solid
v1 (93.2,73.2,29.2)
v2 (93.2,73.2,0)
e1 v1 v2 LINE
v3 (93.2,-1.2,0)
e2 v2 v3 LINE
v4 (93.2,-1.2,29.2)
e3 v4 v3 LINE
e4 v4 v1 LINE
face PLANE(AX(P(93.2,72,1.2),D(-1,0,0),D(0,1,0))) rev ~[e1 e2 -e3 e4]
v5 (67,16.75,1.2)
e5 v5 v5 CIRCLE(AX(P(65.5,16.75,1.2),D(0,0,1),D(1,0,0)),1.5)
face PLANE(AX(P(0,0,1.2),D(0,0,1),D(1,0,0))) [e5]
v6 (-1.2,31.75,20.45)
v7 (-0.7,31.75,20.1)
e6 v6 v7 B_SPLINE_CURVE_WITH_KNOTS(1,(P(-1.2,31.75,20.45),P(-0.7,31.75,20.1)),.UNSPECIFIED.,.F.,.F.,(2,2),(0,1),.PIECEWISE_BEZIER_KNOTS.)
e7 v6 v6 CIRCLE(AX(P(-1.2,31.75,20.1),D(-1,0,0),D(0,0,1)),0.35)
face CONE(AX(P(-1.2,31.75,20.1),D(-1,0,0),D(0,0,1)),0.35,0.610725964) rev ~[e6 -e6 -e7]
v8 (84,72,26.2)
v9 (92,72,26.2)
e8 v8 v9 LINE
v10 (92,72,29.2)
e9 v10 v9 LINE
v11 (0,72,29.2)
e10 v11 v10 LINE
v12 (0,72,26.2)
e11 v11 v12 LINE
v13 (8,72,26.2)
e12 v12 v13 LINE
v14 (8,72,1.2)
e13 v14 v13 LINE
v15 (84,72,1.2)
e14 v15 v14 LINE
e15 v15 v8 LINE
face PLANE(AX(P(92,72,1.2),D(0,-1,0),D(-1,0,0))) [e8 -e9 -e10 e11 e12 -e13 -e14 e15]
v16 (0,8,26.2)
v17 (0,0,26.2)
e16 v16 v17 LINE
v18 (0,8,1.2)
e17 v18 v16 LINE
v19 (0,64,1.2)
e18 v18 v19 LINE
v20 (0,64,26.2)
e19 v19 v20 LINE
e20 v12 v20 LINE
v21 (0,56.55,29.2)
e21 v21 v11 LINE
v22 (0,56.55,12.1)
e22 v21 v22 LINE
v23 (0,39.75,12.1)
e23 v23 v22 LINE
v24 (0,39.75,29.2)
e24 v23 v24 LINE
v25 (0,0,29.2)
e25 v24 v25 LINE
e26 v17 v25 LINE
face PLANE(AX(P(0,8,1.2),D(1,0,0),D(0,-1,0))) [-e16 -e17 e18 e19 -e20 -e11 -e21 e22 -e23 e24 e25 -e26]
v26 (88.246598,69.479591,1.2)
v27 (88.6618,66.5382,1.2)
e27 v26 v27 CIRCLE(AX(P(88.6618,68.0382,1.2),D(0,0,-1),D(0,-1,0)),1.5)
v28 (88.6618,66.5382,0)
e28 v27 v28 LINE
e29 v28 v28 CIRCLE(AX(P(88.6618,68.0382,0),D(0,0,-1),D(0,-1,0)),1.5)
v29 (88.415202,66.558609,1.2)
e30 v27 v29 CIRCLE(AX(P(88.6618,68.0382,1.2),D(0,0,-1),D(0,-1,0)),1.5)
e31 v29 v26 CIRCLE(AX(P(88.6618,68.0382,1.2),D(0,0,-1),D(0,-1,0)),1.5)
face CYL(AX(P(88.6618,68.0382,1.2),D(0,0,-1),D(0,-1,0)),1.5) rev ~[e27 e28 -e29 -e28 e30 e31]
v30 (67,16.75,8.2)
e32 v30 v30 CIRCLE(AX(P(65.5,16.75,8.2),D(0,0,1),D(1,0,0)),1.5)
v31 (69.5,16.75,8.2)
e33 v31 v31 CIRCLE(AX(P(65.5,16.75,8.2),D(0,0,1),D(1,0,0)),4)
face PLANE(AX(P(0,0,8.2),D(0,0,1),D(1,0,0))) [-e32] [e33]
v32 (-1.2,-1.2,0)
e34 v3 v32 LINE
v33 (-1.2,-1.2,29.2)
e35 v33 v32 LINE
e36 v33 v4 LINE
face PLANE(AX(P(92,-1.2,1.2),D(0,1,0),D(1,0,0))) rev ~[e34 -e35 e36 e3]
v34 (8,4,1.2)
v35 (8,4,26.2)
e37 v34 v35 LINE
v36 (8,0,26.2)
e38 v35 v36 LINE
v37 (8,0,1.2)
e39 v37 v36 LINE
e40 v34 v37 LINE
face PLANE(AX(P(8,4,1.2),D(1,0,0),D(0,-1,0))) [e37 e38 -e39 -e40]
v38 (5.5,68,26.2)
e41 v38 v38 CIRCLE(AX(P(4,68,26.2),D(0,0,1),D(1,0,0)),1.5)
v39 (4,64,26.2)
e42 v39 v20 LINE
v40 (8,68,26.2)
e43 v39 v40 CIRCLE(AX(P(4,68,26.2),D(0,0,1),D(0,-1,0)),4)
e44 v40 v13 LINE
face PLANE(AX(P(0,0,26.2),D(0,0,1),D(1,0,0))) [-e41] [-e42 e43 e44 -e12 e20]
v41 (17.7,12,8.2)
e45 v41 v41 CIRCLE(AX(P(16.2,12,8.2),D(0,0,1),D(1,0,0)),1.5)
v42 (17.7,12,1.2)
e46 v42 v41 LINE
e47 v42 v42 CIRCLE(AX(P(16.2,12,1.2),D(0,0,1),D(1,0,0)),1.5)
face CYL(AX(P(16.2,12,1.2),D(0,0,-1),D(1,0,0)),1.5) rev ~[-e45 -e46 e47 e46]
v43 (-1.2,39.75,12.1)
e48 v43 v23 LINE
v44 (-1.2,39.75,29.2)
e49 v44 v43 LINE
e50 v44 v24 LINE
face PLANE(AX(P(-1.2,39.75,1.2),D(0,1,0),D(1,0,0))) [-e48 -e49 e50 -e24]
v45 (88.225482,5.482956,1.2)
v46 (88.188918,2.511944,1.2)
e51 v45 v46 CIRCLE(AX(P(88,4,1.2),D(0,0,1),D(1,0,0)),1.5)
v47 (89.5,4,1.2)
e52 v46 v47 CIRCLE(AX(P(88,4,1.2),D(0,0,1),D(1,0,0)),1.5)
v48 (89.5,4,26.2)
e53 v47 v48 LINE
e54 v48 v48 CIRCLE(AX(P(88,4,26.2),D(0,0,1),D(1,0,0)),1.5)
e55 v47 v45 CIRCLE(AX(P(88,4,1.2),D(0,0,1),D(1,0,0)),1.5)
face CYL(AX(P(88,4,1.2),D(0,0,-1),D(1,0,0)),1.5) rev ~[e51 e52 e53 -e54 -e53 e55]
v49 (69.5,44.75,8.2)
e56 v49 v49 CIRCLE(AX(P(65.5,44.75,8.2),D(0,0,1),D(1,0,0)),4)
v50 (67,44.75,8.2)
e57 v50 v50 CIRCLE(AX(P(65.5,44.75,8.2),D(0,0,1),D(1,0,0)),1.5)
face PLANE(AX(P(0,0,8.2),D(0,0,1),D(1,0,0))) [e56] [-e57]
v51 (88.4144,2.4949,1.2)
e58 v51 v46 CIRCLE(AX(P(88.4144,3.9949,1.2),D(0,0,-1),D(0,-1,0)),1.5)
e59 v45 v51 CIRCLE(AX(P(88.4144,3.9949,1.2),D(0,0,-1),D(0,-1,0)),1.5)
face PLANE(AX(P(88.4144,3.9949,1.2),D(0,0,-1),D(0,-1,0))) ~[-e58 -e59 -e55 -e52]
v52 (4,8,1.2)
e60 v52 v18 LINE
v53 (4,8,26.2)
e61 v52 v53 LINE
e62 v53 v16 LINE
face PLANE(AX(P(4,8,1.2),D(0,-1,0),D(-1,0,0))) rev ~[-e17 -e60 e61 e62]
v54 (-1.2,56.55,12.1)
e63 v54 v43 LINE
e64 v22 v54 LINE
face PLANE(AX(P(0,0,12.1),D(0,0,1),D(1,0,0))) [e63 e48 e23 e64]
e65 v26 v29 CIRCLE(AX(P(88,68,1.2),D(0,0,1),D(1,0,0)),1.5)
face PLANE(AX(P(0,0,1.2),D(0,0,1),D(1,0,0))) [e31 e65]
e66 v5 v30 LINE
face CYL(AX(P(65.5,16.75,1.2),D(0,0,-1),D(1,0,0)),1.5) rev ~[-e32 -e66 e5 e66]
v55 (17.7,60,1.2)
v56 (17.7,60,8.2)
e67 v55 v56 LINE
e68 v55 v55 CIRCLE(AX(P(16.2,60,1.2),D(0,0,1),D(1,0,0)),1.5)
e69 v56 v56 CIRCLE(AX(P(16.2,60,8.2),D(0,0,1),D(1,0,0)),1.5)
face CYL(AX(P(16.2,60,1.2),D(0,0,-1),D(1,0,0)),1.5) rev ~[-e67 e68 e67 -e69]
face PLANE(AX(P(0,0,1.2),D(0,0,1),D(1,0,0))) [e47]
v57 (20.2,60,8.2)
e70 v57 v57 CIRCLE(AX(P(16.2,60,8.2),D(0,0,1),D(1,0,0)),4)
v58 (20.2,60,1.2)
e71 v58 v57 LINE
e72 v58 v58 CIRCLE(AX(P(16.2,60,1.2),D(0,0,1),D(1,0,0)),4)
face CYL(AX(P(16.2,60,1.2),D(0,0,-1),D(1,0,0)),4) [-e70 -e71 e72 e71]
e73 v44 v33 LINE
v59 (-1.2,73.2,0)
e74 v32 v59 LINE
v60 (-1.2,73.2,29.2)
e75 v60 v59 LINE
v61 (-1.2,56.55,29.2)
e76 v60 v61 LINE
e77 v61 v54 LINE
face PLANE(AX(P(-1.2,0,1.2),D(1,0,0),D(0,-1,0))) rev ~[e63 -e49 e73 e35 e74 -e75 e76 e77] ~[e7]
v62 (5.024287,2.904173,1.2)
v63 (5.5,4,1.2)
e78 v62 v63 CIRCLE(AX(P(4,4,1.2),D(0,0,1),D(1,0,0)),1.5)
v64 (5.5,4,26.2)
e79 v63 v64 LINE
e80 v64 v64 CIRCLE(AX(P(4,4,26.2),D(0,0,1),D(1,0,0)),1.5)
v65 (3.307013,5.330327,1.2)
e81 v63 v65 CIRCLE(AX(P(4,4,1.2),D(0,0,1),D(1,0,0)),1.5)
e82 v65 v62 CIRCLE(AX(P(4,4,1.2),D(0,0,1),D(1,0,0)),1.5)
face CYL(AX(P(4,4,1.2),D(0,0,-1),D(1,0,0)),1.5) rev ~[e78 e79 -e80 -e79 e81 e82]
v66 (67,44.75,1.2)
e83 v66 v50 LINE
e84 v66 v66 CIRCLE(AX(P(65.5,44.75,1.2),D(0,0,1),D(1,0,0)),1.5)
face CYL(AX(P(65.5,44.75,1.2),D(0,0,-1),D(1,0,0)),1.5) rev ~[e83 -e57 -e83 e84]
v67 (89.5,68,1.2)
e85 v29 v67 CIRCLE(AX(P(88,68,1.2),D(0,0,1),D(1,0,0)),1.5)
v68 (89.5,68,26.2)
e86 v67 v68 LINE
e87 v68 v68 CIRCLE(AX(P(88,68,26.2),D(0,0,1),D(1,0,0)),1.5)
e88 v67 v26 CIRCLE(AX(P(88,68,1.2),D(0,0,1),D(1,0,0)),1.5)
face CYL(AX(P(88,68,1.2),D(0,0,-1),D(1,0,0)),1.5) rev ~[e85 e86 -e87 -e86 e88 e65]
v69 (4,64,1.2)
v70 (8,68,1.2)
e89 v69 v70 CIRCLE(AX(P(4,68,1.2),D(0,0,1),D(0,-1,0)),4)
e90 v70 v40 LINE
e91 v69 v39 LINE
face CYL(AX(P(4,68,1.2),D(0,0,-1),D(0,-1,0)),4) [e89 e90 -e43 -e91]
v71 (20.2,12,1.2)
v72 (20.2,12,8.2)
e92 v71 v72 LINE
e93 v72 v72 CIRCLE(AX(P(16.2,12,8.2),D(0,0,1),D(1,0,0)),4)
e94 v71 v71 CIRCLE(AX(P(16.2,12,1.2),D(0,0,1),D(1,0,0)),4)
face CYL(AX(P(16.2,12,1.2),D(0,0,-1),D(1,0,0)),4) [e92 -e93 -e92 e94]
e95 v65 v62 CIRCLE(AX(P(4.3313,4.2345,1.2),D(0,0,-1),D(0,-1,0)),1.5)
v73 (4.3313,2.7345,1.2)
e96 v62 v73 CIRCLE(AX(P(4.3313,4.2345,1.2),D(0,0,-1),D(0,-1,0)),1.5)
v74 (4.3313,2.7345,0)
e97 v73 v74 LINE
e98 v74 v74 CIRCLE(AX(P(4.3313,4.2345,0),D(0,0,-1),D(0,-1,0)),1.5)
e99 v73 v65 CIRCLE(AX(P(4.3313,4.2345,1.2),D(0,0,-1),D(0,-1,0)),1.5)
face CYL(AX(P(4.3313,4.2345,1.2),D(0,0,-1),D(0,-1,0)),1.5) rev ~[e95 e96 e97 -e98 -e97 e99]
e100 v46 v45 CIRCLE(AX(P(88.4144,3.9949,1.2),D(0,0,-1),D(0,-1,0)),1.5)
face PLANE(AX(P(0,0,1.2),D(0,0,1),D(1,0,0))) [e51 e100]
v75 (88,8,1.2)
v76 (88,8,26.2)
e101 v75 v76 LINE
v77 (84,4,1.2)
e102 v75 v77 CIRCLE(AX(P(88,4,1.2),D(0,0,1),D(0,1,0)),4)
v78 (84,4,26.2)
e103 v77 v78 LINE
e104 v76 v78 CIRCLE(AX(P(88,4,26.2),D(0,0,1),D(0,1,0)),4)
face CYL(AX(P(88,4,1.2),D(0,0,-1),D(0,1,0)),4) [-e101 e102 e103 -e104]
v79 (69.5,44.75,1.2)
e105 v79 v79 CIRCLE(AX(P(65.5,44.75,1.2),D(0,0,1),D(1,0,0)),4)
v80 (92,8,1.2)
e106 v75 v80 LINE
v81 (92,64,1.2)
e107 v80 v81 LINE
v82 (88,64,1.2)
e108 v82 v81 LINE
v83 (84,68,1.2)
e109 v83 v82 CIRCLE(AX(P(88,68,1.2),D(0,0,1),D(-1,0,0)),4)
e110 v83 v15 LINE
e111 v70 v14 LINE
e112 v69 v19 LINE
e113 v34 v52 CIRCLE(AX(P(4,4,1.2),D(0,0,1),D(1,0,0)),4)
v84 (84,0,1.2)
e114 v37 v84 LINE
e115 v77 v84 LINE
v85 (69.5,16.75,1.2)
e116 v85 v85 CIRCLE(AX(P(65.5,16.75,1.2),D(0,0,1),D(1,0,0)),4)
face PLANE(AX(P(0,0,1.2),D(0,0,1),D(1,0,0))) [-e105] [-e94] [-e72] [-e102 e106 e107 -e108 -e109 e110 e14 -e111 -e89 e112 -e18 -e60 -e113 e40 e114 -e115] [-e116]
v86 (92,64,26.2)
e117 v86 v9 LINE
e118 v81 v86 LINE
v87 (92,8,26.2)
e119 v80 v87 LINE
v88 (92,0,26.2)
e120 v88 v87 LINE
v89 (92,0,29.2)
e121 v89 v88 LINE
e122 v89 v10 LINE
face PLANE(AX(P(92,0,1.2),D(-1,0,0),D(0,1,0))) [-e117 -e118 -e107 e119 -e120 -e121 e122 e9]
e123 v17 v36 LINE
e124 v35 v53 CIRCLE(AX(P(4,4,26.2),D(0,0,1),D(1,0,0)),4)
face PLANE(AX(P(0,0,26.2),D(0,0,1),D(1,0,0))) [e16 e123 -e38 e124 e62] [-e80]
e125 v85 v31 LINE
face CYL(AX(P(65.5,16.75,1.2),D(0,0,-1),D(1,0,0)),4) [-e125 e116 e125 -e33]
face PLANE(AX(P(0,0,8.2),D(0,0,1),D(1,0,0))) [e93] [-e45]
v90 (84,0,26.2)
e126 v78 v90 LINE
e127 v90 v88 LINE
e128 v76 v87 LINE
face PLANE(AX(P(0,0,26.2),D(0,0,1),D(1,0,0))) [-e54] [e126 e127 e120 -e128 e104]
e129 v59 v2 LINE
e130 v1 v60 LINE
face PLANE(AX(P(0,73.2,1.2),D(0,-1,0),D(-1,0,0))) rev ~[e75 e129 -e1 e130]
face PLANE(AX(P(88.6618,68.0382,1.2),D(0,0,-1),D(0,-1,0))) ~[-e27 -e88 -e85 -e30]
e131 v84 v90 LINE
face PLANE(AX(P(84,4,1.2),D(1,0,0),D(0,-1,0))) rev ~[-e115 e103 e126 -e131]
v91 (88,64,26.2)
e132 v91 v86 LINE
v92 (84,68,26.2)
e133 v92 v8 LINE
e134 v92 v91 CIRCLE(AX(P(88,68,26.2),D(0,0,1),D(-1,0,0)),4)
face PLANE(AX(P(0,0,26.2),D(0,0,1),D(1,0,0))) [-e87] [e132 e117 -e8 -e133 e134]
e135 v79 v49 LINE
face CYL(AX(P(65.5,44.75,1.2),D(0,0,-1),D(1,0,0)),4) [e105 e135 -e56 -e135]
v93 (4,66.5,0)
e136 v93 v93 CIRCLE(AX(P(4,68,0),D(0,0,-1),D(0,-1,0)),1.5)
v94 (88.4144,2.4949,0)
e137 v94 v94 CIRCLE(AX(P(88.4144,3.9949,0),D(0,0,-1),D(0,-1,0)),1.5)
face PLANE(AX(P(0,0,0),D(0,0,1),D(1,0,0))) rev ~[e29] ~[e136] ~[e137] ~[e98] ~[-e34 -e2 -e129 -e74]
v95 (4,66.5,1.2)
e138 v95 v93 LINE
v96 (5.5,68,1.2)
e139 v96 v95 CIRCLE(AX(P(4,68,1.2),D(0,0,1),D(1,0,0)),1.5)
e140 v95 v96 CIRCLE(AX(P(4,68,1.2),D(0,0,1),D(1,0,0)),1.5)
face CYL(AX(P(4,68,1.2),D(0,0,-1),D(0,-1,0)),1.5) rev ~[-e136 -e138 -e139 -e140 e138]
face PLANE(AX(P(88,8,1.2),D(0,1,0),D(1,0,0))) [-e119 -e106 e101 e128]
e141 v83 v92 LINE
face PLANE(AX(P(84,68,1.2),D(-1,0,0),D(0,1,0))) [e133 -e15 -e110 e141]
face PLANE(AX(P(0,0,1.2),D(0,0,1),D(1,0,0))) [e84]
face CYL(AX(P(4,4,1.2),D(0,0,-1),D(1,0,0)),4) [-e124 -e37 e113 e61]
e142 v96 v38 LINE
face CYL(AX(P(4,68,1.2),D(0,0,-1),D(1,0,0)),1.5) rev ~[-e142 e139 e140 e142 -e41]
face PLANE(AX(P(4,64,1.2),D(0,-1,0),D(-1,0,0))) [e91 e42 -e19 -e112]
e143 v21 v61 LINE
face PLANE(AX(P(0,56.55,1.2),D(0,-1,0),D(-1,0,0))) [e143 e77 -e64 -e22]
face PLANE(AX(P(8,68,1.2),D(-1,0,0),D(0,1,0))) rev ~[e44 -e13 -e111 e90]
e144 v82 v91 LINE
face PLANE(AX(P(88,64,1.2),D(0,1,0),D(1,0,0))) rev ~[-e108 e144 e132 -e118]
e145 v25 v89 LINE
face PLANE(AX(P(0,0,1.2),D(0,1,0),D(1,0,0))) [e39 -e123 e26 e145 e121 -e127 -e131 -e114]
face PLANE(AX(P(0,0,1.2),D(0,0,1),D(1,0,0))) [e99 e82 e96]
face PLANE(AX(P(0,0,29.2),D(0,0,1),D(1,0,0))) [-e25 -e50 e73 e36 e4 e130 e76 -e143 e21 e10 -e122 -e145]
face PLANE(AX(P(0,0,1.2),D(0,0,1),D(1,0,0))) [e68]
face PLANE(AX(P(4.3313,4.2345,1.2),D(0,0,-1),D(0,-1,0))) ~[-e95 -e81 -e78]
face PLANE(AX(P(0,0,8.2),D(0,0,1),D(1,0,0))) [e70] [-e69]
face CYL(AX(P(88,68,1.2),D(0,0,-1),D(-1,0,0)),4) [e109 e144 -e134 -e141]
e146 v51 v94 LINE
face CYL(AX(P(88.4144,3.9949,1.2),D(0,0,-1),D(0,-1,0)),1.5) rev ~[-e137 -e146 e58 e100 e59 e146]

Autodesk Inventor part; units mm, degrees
ref_plane "YZ Plane" through (0, 0, 0) normal (1, 0, 0) x (0, 1, 0)
ref_plane "XZ Plane" through (0, 0, 0) normal (0, 1, 0) x (-1, 0, 0)
sketch "Zakladna" plane through (0, 0, 0) normal (0, 0, 1) x (1, 0, 0)
  line L0 (0, 0) -> (92, 0)
  line L1 (92, 0) -> (92, 72)
  line L2 (92, 72) -> (0, 72)
  line L3 (0, 72) -> (0, 0)
  dimension "d0" = 92
  dimension "d1" = 72
extrude "Extrusion1" add sketch "Zakladna" along normal blind 1.2
sketch "Steny" plane through (0, 0, 1.2) normal (0, 0, 1) x (1, 0, 0)
  line L0 (0, 0) -> (92, 0) projected
  line L1 (0, 8) -> (0, 0)
  line L2 (0, 0) -> (8, 0)
  line L3 (0, 0) -> (8, 0)
  line L4 (0, 72) -> (8, 72)
  line L5 (0, 72) -> (8, 72)
  line L6 (92, 0) -> (92, 72) projected
  line L7 (0, 56.55) -> (-1.2, 56.55)
  line L8 (-1.2, 39.75) -> (-1.2, 0)
  line L9 (-1.2, 0) -> (-1.2, -1.2)
  line L10 (-1.2, -1.2) -> (0, -1.2)
  line L11 (0, 0) -> (0, 39.75)
  line L12 (92, 72) -> (0, 72) projected
  line L13 (0, 73.2) -> (-1.2, 73.2)
  line L14 (-1.2, 73.2) -> (-1.2, 56.55)
  line L15 (0, 72) -> (92, 72)
  line L16 (93.2, 72) -> (93.2, 73.2)
  line L17 (93.2, 73.2) -> (0, 73.2)
  line L18 (92, 72) -> (92, 0)
  line L19 (92, -1.2) -> (93.2, -1.2)
  line L20 (93.2, -1.2) -> (93.2, 72)
  line L21 (92, -1.2) -> (0, -1.2)
  line L22 (-1.2, 39.75) -> (0, 39.75)
  line L23 (0, 56.55) -> (0, 72)
  point P0 (8, 4)
  dimension "d15" = 1.2
  dimension "d16" = 16.8
  dimension "d17" = 1.2
  dimension "d18" = 1.2
  dimension "d19" = 1.2
  dimension "d20" = 1.2
  dimension "d21" = 1.2
  dimension "d23" = 1.2
sketch "Uchyt_arduino" plane through (0, 0, 1.2) normal (0, 0, 1) x (1, 0, 0)
  circle A0 centre (16.2, 12) radius 4
  circle A1 centre (16.2, 12) radius 1.5
  circle A2 centre (16.2, 60) radius 4
  circle A3 centre (16.2, 60) radius 1.5
  circle A4 centre (65.5, 44.75) radius 4
  circle A5 centre (65.5, 44.75) radius 1.5
  circle A6 centre (65.5, 16.75) radius 4
  circle A7 centre (65.5, 16.75) radius 1.5
  circle A8 centre (16.2, 12) radius 4
  circle A9 centre (16.2, 12) radius 1.5
  circle A10 centre (16.2, 60) radius 4
  circle A11 centre (16.2, 60) radius 1.5
  circle A12 centre (65.5, 44.75) radius 4
  circle A13 centre (65.5, 44.75) radius 1.5
  circle A14 centre (65.5, 16.75) radius 4
  circle A15 centre (65.5, 16.75) radius 1.5
  point P0 (0, 0)
  dimension "d31" = 8
  dimension "d32" = 3
  dimension "d33" = 8
  dimension "d34" = 3
  dimension "d35" = 8
  dimension "d36" = 3
  dimension "d37" = 8
  dimension "d38" = 3
  dimension "d39" = 8
  dimension "d40" = 3
  dimension "d41" = 8
  dimension "d42" = 3
sketch "Stena_RJ45" plane through (0, 0, 1.2) normal (0, 0, 1) x (1, 0, 0)
  line L0 (0, 56.55) -> (-1.2, 56.55) projected
  line L1 (-1.2, 39.75) -> (0, 39.75) projected
  line L2 (0, 36) -> (0, 62.75) projected
  line L3 (-1.2, 56.55) -> (-1.2, 39.75)
  line L4 (0, 39.75) -> (-1.2, 39.75)
  line L5 (0, 39.75) -> (0, 56.55)
  line L6 (0, 72) -> (0, 0) projected
sketch "Spojeni_srouby" plane through (0, 0, 1.2) normal (0, 0, 1) x (1, 0, 0)
  line L0 (8, 4) -> (8, 0) projected
  arc A0 (8, 4) -> (4, 8) centre (4, 4) ccw projected
  line L1 (4, 8) -> (0, 8) projected
  circle A1 centre (4, 4) radius 1.5 projected
  line L2 (0, 72) -> (0, 0) projected
  line L3 (0, 8) -> (0, 0)
  line L4 (0, 0) -> (8, 0)
  line L5 (0, 0) -> (92, 0)
  line L6 (92, 0) -> (92, 36)
  line L7 (92, 0) -> (92, 72)
  line L8 (8, 68) -> (8, 72)
  arc A2 (4, 64) -> (8, 68) centre (4, 68) ccw
  line L9 (4, 64) -> (0, 64)
  circle A3 centre (4, 68) radius 1.5
  line L10 (0, 0) -> (0, 72)
  line L11 (0, 64) -> (0, 72)
  line L12 (0, 72) -> (8, 72)
  line L13 (0, 72) -> (92, 72)
  line L14 (84, 4) -> (84, 0)
  arc A4 (88, 8) -> (84, 4) centre (88, 4) ccw
  line L15 (88, 8) -> (92, 8)
  circle A5 centre (88, 4) radius 1.5
  line L16 (92, 72) -> (92, 0)
  line L17 (92, 8) -> (92, 0)
  line L18 (92, 0) -> (84, 0)
  line L19 (92, 0) -> (0, 0)
  line L20 (84, 68) -> (84, 72)
  arc A6 (84, 68) -> (88, 64) centre (88, 68) ccw
  line L21 (88, 64) -> (92, 64)
  circle A7 centre (88, 68) radius 1.5
  line L22 (92, 0) -> (92, 72)
  line L23 (92, 64) -> (92, 72)
  line L24 (92, 72) -> (84, 72)
  line L25 (92, 72) -> (0, 72)
extrude "Extrusion2" add sketch "Uchyt_arduino" along normal blind 7
extrude "Extrusion3" add sketch "Steny" along normal blind 28 and the other way blind 1.2
extrude "Extrusion4" add sketch "Stena_RJ45" along normal blind 10.9 and the other way blind 1.2
extrude "Extrusion5" add sketch "Spojeni_srouby" along normal blind 25 contours L0 L4 L2 L1 A0 | L14 A4 L15 L6 L5 | L2 L12 L8 A2 L9 | L21 A6 L20 L13 L7
sketch "Sketch6" plane through (4, 4, 1.2) normal (0, 0, 1) x (1, 0, 0)
  circle A0 centre (0, 64) radius 1.5 projected
  point P0 (-4, -4)
  point P1 (0.3313, 0.2345)
  point P2 (84.6618, 64.0382)
  point P3 (84.4144, -0.0051)
hole "Hole1" at (4, 68, 1.2) at (4.3313, 4.2345, 1.2) at (88.6618, 68.0382, 1.2) at (88.4144, 3.9949, 1.2) direction (0, 0, -1) diameter 3 end through all
sketch "napajeni_znacka1" plane through (-1.2, -1.2, 0) normal (-1, 0, 0) x (0, 0, 1)
  line L0 (12.1, 57.75) -> (12.1, 40.95) projected
  line L1 (0, 0) -> (29.2, 0) projected
  circle A0 centre (20.1, 32.95) radius 0.35
  point P0 (0, 1.2)
  dimension "d65" = 0.7
ref_plane "napajeni_znacka2_rovina" through (-0.7, -1.2, 0) normal (-1, 0, 0) x (0, 0, 1)
sketch "napajeni_znacka2" plane through (-0.7, -1.2, 0) normal (-1, 0, 0) x (0, 0, 1)
  point P0 (0, 1.2)
  point P1 (20.1, 32.95)
  point P2 (20.1, 32.95)
loft "Loft1" cut profiles "napajeni_znacka1" section 2 point at (-0.7, 31.75, 20.1)
properties part number "case_bottom"
